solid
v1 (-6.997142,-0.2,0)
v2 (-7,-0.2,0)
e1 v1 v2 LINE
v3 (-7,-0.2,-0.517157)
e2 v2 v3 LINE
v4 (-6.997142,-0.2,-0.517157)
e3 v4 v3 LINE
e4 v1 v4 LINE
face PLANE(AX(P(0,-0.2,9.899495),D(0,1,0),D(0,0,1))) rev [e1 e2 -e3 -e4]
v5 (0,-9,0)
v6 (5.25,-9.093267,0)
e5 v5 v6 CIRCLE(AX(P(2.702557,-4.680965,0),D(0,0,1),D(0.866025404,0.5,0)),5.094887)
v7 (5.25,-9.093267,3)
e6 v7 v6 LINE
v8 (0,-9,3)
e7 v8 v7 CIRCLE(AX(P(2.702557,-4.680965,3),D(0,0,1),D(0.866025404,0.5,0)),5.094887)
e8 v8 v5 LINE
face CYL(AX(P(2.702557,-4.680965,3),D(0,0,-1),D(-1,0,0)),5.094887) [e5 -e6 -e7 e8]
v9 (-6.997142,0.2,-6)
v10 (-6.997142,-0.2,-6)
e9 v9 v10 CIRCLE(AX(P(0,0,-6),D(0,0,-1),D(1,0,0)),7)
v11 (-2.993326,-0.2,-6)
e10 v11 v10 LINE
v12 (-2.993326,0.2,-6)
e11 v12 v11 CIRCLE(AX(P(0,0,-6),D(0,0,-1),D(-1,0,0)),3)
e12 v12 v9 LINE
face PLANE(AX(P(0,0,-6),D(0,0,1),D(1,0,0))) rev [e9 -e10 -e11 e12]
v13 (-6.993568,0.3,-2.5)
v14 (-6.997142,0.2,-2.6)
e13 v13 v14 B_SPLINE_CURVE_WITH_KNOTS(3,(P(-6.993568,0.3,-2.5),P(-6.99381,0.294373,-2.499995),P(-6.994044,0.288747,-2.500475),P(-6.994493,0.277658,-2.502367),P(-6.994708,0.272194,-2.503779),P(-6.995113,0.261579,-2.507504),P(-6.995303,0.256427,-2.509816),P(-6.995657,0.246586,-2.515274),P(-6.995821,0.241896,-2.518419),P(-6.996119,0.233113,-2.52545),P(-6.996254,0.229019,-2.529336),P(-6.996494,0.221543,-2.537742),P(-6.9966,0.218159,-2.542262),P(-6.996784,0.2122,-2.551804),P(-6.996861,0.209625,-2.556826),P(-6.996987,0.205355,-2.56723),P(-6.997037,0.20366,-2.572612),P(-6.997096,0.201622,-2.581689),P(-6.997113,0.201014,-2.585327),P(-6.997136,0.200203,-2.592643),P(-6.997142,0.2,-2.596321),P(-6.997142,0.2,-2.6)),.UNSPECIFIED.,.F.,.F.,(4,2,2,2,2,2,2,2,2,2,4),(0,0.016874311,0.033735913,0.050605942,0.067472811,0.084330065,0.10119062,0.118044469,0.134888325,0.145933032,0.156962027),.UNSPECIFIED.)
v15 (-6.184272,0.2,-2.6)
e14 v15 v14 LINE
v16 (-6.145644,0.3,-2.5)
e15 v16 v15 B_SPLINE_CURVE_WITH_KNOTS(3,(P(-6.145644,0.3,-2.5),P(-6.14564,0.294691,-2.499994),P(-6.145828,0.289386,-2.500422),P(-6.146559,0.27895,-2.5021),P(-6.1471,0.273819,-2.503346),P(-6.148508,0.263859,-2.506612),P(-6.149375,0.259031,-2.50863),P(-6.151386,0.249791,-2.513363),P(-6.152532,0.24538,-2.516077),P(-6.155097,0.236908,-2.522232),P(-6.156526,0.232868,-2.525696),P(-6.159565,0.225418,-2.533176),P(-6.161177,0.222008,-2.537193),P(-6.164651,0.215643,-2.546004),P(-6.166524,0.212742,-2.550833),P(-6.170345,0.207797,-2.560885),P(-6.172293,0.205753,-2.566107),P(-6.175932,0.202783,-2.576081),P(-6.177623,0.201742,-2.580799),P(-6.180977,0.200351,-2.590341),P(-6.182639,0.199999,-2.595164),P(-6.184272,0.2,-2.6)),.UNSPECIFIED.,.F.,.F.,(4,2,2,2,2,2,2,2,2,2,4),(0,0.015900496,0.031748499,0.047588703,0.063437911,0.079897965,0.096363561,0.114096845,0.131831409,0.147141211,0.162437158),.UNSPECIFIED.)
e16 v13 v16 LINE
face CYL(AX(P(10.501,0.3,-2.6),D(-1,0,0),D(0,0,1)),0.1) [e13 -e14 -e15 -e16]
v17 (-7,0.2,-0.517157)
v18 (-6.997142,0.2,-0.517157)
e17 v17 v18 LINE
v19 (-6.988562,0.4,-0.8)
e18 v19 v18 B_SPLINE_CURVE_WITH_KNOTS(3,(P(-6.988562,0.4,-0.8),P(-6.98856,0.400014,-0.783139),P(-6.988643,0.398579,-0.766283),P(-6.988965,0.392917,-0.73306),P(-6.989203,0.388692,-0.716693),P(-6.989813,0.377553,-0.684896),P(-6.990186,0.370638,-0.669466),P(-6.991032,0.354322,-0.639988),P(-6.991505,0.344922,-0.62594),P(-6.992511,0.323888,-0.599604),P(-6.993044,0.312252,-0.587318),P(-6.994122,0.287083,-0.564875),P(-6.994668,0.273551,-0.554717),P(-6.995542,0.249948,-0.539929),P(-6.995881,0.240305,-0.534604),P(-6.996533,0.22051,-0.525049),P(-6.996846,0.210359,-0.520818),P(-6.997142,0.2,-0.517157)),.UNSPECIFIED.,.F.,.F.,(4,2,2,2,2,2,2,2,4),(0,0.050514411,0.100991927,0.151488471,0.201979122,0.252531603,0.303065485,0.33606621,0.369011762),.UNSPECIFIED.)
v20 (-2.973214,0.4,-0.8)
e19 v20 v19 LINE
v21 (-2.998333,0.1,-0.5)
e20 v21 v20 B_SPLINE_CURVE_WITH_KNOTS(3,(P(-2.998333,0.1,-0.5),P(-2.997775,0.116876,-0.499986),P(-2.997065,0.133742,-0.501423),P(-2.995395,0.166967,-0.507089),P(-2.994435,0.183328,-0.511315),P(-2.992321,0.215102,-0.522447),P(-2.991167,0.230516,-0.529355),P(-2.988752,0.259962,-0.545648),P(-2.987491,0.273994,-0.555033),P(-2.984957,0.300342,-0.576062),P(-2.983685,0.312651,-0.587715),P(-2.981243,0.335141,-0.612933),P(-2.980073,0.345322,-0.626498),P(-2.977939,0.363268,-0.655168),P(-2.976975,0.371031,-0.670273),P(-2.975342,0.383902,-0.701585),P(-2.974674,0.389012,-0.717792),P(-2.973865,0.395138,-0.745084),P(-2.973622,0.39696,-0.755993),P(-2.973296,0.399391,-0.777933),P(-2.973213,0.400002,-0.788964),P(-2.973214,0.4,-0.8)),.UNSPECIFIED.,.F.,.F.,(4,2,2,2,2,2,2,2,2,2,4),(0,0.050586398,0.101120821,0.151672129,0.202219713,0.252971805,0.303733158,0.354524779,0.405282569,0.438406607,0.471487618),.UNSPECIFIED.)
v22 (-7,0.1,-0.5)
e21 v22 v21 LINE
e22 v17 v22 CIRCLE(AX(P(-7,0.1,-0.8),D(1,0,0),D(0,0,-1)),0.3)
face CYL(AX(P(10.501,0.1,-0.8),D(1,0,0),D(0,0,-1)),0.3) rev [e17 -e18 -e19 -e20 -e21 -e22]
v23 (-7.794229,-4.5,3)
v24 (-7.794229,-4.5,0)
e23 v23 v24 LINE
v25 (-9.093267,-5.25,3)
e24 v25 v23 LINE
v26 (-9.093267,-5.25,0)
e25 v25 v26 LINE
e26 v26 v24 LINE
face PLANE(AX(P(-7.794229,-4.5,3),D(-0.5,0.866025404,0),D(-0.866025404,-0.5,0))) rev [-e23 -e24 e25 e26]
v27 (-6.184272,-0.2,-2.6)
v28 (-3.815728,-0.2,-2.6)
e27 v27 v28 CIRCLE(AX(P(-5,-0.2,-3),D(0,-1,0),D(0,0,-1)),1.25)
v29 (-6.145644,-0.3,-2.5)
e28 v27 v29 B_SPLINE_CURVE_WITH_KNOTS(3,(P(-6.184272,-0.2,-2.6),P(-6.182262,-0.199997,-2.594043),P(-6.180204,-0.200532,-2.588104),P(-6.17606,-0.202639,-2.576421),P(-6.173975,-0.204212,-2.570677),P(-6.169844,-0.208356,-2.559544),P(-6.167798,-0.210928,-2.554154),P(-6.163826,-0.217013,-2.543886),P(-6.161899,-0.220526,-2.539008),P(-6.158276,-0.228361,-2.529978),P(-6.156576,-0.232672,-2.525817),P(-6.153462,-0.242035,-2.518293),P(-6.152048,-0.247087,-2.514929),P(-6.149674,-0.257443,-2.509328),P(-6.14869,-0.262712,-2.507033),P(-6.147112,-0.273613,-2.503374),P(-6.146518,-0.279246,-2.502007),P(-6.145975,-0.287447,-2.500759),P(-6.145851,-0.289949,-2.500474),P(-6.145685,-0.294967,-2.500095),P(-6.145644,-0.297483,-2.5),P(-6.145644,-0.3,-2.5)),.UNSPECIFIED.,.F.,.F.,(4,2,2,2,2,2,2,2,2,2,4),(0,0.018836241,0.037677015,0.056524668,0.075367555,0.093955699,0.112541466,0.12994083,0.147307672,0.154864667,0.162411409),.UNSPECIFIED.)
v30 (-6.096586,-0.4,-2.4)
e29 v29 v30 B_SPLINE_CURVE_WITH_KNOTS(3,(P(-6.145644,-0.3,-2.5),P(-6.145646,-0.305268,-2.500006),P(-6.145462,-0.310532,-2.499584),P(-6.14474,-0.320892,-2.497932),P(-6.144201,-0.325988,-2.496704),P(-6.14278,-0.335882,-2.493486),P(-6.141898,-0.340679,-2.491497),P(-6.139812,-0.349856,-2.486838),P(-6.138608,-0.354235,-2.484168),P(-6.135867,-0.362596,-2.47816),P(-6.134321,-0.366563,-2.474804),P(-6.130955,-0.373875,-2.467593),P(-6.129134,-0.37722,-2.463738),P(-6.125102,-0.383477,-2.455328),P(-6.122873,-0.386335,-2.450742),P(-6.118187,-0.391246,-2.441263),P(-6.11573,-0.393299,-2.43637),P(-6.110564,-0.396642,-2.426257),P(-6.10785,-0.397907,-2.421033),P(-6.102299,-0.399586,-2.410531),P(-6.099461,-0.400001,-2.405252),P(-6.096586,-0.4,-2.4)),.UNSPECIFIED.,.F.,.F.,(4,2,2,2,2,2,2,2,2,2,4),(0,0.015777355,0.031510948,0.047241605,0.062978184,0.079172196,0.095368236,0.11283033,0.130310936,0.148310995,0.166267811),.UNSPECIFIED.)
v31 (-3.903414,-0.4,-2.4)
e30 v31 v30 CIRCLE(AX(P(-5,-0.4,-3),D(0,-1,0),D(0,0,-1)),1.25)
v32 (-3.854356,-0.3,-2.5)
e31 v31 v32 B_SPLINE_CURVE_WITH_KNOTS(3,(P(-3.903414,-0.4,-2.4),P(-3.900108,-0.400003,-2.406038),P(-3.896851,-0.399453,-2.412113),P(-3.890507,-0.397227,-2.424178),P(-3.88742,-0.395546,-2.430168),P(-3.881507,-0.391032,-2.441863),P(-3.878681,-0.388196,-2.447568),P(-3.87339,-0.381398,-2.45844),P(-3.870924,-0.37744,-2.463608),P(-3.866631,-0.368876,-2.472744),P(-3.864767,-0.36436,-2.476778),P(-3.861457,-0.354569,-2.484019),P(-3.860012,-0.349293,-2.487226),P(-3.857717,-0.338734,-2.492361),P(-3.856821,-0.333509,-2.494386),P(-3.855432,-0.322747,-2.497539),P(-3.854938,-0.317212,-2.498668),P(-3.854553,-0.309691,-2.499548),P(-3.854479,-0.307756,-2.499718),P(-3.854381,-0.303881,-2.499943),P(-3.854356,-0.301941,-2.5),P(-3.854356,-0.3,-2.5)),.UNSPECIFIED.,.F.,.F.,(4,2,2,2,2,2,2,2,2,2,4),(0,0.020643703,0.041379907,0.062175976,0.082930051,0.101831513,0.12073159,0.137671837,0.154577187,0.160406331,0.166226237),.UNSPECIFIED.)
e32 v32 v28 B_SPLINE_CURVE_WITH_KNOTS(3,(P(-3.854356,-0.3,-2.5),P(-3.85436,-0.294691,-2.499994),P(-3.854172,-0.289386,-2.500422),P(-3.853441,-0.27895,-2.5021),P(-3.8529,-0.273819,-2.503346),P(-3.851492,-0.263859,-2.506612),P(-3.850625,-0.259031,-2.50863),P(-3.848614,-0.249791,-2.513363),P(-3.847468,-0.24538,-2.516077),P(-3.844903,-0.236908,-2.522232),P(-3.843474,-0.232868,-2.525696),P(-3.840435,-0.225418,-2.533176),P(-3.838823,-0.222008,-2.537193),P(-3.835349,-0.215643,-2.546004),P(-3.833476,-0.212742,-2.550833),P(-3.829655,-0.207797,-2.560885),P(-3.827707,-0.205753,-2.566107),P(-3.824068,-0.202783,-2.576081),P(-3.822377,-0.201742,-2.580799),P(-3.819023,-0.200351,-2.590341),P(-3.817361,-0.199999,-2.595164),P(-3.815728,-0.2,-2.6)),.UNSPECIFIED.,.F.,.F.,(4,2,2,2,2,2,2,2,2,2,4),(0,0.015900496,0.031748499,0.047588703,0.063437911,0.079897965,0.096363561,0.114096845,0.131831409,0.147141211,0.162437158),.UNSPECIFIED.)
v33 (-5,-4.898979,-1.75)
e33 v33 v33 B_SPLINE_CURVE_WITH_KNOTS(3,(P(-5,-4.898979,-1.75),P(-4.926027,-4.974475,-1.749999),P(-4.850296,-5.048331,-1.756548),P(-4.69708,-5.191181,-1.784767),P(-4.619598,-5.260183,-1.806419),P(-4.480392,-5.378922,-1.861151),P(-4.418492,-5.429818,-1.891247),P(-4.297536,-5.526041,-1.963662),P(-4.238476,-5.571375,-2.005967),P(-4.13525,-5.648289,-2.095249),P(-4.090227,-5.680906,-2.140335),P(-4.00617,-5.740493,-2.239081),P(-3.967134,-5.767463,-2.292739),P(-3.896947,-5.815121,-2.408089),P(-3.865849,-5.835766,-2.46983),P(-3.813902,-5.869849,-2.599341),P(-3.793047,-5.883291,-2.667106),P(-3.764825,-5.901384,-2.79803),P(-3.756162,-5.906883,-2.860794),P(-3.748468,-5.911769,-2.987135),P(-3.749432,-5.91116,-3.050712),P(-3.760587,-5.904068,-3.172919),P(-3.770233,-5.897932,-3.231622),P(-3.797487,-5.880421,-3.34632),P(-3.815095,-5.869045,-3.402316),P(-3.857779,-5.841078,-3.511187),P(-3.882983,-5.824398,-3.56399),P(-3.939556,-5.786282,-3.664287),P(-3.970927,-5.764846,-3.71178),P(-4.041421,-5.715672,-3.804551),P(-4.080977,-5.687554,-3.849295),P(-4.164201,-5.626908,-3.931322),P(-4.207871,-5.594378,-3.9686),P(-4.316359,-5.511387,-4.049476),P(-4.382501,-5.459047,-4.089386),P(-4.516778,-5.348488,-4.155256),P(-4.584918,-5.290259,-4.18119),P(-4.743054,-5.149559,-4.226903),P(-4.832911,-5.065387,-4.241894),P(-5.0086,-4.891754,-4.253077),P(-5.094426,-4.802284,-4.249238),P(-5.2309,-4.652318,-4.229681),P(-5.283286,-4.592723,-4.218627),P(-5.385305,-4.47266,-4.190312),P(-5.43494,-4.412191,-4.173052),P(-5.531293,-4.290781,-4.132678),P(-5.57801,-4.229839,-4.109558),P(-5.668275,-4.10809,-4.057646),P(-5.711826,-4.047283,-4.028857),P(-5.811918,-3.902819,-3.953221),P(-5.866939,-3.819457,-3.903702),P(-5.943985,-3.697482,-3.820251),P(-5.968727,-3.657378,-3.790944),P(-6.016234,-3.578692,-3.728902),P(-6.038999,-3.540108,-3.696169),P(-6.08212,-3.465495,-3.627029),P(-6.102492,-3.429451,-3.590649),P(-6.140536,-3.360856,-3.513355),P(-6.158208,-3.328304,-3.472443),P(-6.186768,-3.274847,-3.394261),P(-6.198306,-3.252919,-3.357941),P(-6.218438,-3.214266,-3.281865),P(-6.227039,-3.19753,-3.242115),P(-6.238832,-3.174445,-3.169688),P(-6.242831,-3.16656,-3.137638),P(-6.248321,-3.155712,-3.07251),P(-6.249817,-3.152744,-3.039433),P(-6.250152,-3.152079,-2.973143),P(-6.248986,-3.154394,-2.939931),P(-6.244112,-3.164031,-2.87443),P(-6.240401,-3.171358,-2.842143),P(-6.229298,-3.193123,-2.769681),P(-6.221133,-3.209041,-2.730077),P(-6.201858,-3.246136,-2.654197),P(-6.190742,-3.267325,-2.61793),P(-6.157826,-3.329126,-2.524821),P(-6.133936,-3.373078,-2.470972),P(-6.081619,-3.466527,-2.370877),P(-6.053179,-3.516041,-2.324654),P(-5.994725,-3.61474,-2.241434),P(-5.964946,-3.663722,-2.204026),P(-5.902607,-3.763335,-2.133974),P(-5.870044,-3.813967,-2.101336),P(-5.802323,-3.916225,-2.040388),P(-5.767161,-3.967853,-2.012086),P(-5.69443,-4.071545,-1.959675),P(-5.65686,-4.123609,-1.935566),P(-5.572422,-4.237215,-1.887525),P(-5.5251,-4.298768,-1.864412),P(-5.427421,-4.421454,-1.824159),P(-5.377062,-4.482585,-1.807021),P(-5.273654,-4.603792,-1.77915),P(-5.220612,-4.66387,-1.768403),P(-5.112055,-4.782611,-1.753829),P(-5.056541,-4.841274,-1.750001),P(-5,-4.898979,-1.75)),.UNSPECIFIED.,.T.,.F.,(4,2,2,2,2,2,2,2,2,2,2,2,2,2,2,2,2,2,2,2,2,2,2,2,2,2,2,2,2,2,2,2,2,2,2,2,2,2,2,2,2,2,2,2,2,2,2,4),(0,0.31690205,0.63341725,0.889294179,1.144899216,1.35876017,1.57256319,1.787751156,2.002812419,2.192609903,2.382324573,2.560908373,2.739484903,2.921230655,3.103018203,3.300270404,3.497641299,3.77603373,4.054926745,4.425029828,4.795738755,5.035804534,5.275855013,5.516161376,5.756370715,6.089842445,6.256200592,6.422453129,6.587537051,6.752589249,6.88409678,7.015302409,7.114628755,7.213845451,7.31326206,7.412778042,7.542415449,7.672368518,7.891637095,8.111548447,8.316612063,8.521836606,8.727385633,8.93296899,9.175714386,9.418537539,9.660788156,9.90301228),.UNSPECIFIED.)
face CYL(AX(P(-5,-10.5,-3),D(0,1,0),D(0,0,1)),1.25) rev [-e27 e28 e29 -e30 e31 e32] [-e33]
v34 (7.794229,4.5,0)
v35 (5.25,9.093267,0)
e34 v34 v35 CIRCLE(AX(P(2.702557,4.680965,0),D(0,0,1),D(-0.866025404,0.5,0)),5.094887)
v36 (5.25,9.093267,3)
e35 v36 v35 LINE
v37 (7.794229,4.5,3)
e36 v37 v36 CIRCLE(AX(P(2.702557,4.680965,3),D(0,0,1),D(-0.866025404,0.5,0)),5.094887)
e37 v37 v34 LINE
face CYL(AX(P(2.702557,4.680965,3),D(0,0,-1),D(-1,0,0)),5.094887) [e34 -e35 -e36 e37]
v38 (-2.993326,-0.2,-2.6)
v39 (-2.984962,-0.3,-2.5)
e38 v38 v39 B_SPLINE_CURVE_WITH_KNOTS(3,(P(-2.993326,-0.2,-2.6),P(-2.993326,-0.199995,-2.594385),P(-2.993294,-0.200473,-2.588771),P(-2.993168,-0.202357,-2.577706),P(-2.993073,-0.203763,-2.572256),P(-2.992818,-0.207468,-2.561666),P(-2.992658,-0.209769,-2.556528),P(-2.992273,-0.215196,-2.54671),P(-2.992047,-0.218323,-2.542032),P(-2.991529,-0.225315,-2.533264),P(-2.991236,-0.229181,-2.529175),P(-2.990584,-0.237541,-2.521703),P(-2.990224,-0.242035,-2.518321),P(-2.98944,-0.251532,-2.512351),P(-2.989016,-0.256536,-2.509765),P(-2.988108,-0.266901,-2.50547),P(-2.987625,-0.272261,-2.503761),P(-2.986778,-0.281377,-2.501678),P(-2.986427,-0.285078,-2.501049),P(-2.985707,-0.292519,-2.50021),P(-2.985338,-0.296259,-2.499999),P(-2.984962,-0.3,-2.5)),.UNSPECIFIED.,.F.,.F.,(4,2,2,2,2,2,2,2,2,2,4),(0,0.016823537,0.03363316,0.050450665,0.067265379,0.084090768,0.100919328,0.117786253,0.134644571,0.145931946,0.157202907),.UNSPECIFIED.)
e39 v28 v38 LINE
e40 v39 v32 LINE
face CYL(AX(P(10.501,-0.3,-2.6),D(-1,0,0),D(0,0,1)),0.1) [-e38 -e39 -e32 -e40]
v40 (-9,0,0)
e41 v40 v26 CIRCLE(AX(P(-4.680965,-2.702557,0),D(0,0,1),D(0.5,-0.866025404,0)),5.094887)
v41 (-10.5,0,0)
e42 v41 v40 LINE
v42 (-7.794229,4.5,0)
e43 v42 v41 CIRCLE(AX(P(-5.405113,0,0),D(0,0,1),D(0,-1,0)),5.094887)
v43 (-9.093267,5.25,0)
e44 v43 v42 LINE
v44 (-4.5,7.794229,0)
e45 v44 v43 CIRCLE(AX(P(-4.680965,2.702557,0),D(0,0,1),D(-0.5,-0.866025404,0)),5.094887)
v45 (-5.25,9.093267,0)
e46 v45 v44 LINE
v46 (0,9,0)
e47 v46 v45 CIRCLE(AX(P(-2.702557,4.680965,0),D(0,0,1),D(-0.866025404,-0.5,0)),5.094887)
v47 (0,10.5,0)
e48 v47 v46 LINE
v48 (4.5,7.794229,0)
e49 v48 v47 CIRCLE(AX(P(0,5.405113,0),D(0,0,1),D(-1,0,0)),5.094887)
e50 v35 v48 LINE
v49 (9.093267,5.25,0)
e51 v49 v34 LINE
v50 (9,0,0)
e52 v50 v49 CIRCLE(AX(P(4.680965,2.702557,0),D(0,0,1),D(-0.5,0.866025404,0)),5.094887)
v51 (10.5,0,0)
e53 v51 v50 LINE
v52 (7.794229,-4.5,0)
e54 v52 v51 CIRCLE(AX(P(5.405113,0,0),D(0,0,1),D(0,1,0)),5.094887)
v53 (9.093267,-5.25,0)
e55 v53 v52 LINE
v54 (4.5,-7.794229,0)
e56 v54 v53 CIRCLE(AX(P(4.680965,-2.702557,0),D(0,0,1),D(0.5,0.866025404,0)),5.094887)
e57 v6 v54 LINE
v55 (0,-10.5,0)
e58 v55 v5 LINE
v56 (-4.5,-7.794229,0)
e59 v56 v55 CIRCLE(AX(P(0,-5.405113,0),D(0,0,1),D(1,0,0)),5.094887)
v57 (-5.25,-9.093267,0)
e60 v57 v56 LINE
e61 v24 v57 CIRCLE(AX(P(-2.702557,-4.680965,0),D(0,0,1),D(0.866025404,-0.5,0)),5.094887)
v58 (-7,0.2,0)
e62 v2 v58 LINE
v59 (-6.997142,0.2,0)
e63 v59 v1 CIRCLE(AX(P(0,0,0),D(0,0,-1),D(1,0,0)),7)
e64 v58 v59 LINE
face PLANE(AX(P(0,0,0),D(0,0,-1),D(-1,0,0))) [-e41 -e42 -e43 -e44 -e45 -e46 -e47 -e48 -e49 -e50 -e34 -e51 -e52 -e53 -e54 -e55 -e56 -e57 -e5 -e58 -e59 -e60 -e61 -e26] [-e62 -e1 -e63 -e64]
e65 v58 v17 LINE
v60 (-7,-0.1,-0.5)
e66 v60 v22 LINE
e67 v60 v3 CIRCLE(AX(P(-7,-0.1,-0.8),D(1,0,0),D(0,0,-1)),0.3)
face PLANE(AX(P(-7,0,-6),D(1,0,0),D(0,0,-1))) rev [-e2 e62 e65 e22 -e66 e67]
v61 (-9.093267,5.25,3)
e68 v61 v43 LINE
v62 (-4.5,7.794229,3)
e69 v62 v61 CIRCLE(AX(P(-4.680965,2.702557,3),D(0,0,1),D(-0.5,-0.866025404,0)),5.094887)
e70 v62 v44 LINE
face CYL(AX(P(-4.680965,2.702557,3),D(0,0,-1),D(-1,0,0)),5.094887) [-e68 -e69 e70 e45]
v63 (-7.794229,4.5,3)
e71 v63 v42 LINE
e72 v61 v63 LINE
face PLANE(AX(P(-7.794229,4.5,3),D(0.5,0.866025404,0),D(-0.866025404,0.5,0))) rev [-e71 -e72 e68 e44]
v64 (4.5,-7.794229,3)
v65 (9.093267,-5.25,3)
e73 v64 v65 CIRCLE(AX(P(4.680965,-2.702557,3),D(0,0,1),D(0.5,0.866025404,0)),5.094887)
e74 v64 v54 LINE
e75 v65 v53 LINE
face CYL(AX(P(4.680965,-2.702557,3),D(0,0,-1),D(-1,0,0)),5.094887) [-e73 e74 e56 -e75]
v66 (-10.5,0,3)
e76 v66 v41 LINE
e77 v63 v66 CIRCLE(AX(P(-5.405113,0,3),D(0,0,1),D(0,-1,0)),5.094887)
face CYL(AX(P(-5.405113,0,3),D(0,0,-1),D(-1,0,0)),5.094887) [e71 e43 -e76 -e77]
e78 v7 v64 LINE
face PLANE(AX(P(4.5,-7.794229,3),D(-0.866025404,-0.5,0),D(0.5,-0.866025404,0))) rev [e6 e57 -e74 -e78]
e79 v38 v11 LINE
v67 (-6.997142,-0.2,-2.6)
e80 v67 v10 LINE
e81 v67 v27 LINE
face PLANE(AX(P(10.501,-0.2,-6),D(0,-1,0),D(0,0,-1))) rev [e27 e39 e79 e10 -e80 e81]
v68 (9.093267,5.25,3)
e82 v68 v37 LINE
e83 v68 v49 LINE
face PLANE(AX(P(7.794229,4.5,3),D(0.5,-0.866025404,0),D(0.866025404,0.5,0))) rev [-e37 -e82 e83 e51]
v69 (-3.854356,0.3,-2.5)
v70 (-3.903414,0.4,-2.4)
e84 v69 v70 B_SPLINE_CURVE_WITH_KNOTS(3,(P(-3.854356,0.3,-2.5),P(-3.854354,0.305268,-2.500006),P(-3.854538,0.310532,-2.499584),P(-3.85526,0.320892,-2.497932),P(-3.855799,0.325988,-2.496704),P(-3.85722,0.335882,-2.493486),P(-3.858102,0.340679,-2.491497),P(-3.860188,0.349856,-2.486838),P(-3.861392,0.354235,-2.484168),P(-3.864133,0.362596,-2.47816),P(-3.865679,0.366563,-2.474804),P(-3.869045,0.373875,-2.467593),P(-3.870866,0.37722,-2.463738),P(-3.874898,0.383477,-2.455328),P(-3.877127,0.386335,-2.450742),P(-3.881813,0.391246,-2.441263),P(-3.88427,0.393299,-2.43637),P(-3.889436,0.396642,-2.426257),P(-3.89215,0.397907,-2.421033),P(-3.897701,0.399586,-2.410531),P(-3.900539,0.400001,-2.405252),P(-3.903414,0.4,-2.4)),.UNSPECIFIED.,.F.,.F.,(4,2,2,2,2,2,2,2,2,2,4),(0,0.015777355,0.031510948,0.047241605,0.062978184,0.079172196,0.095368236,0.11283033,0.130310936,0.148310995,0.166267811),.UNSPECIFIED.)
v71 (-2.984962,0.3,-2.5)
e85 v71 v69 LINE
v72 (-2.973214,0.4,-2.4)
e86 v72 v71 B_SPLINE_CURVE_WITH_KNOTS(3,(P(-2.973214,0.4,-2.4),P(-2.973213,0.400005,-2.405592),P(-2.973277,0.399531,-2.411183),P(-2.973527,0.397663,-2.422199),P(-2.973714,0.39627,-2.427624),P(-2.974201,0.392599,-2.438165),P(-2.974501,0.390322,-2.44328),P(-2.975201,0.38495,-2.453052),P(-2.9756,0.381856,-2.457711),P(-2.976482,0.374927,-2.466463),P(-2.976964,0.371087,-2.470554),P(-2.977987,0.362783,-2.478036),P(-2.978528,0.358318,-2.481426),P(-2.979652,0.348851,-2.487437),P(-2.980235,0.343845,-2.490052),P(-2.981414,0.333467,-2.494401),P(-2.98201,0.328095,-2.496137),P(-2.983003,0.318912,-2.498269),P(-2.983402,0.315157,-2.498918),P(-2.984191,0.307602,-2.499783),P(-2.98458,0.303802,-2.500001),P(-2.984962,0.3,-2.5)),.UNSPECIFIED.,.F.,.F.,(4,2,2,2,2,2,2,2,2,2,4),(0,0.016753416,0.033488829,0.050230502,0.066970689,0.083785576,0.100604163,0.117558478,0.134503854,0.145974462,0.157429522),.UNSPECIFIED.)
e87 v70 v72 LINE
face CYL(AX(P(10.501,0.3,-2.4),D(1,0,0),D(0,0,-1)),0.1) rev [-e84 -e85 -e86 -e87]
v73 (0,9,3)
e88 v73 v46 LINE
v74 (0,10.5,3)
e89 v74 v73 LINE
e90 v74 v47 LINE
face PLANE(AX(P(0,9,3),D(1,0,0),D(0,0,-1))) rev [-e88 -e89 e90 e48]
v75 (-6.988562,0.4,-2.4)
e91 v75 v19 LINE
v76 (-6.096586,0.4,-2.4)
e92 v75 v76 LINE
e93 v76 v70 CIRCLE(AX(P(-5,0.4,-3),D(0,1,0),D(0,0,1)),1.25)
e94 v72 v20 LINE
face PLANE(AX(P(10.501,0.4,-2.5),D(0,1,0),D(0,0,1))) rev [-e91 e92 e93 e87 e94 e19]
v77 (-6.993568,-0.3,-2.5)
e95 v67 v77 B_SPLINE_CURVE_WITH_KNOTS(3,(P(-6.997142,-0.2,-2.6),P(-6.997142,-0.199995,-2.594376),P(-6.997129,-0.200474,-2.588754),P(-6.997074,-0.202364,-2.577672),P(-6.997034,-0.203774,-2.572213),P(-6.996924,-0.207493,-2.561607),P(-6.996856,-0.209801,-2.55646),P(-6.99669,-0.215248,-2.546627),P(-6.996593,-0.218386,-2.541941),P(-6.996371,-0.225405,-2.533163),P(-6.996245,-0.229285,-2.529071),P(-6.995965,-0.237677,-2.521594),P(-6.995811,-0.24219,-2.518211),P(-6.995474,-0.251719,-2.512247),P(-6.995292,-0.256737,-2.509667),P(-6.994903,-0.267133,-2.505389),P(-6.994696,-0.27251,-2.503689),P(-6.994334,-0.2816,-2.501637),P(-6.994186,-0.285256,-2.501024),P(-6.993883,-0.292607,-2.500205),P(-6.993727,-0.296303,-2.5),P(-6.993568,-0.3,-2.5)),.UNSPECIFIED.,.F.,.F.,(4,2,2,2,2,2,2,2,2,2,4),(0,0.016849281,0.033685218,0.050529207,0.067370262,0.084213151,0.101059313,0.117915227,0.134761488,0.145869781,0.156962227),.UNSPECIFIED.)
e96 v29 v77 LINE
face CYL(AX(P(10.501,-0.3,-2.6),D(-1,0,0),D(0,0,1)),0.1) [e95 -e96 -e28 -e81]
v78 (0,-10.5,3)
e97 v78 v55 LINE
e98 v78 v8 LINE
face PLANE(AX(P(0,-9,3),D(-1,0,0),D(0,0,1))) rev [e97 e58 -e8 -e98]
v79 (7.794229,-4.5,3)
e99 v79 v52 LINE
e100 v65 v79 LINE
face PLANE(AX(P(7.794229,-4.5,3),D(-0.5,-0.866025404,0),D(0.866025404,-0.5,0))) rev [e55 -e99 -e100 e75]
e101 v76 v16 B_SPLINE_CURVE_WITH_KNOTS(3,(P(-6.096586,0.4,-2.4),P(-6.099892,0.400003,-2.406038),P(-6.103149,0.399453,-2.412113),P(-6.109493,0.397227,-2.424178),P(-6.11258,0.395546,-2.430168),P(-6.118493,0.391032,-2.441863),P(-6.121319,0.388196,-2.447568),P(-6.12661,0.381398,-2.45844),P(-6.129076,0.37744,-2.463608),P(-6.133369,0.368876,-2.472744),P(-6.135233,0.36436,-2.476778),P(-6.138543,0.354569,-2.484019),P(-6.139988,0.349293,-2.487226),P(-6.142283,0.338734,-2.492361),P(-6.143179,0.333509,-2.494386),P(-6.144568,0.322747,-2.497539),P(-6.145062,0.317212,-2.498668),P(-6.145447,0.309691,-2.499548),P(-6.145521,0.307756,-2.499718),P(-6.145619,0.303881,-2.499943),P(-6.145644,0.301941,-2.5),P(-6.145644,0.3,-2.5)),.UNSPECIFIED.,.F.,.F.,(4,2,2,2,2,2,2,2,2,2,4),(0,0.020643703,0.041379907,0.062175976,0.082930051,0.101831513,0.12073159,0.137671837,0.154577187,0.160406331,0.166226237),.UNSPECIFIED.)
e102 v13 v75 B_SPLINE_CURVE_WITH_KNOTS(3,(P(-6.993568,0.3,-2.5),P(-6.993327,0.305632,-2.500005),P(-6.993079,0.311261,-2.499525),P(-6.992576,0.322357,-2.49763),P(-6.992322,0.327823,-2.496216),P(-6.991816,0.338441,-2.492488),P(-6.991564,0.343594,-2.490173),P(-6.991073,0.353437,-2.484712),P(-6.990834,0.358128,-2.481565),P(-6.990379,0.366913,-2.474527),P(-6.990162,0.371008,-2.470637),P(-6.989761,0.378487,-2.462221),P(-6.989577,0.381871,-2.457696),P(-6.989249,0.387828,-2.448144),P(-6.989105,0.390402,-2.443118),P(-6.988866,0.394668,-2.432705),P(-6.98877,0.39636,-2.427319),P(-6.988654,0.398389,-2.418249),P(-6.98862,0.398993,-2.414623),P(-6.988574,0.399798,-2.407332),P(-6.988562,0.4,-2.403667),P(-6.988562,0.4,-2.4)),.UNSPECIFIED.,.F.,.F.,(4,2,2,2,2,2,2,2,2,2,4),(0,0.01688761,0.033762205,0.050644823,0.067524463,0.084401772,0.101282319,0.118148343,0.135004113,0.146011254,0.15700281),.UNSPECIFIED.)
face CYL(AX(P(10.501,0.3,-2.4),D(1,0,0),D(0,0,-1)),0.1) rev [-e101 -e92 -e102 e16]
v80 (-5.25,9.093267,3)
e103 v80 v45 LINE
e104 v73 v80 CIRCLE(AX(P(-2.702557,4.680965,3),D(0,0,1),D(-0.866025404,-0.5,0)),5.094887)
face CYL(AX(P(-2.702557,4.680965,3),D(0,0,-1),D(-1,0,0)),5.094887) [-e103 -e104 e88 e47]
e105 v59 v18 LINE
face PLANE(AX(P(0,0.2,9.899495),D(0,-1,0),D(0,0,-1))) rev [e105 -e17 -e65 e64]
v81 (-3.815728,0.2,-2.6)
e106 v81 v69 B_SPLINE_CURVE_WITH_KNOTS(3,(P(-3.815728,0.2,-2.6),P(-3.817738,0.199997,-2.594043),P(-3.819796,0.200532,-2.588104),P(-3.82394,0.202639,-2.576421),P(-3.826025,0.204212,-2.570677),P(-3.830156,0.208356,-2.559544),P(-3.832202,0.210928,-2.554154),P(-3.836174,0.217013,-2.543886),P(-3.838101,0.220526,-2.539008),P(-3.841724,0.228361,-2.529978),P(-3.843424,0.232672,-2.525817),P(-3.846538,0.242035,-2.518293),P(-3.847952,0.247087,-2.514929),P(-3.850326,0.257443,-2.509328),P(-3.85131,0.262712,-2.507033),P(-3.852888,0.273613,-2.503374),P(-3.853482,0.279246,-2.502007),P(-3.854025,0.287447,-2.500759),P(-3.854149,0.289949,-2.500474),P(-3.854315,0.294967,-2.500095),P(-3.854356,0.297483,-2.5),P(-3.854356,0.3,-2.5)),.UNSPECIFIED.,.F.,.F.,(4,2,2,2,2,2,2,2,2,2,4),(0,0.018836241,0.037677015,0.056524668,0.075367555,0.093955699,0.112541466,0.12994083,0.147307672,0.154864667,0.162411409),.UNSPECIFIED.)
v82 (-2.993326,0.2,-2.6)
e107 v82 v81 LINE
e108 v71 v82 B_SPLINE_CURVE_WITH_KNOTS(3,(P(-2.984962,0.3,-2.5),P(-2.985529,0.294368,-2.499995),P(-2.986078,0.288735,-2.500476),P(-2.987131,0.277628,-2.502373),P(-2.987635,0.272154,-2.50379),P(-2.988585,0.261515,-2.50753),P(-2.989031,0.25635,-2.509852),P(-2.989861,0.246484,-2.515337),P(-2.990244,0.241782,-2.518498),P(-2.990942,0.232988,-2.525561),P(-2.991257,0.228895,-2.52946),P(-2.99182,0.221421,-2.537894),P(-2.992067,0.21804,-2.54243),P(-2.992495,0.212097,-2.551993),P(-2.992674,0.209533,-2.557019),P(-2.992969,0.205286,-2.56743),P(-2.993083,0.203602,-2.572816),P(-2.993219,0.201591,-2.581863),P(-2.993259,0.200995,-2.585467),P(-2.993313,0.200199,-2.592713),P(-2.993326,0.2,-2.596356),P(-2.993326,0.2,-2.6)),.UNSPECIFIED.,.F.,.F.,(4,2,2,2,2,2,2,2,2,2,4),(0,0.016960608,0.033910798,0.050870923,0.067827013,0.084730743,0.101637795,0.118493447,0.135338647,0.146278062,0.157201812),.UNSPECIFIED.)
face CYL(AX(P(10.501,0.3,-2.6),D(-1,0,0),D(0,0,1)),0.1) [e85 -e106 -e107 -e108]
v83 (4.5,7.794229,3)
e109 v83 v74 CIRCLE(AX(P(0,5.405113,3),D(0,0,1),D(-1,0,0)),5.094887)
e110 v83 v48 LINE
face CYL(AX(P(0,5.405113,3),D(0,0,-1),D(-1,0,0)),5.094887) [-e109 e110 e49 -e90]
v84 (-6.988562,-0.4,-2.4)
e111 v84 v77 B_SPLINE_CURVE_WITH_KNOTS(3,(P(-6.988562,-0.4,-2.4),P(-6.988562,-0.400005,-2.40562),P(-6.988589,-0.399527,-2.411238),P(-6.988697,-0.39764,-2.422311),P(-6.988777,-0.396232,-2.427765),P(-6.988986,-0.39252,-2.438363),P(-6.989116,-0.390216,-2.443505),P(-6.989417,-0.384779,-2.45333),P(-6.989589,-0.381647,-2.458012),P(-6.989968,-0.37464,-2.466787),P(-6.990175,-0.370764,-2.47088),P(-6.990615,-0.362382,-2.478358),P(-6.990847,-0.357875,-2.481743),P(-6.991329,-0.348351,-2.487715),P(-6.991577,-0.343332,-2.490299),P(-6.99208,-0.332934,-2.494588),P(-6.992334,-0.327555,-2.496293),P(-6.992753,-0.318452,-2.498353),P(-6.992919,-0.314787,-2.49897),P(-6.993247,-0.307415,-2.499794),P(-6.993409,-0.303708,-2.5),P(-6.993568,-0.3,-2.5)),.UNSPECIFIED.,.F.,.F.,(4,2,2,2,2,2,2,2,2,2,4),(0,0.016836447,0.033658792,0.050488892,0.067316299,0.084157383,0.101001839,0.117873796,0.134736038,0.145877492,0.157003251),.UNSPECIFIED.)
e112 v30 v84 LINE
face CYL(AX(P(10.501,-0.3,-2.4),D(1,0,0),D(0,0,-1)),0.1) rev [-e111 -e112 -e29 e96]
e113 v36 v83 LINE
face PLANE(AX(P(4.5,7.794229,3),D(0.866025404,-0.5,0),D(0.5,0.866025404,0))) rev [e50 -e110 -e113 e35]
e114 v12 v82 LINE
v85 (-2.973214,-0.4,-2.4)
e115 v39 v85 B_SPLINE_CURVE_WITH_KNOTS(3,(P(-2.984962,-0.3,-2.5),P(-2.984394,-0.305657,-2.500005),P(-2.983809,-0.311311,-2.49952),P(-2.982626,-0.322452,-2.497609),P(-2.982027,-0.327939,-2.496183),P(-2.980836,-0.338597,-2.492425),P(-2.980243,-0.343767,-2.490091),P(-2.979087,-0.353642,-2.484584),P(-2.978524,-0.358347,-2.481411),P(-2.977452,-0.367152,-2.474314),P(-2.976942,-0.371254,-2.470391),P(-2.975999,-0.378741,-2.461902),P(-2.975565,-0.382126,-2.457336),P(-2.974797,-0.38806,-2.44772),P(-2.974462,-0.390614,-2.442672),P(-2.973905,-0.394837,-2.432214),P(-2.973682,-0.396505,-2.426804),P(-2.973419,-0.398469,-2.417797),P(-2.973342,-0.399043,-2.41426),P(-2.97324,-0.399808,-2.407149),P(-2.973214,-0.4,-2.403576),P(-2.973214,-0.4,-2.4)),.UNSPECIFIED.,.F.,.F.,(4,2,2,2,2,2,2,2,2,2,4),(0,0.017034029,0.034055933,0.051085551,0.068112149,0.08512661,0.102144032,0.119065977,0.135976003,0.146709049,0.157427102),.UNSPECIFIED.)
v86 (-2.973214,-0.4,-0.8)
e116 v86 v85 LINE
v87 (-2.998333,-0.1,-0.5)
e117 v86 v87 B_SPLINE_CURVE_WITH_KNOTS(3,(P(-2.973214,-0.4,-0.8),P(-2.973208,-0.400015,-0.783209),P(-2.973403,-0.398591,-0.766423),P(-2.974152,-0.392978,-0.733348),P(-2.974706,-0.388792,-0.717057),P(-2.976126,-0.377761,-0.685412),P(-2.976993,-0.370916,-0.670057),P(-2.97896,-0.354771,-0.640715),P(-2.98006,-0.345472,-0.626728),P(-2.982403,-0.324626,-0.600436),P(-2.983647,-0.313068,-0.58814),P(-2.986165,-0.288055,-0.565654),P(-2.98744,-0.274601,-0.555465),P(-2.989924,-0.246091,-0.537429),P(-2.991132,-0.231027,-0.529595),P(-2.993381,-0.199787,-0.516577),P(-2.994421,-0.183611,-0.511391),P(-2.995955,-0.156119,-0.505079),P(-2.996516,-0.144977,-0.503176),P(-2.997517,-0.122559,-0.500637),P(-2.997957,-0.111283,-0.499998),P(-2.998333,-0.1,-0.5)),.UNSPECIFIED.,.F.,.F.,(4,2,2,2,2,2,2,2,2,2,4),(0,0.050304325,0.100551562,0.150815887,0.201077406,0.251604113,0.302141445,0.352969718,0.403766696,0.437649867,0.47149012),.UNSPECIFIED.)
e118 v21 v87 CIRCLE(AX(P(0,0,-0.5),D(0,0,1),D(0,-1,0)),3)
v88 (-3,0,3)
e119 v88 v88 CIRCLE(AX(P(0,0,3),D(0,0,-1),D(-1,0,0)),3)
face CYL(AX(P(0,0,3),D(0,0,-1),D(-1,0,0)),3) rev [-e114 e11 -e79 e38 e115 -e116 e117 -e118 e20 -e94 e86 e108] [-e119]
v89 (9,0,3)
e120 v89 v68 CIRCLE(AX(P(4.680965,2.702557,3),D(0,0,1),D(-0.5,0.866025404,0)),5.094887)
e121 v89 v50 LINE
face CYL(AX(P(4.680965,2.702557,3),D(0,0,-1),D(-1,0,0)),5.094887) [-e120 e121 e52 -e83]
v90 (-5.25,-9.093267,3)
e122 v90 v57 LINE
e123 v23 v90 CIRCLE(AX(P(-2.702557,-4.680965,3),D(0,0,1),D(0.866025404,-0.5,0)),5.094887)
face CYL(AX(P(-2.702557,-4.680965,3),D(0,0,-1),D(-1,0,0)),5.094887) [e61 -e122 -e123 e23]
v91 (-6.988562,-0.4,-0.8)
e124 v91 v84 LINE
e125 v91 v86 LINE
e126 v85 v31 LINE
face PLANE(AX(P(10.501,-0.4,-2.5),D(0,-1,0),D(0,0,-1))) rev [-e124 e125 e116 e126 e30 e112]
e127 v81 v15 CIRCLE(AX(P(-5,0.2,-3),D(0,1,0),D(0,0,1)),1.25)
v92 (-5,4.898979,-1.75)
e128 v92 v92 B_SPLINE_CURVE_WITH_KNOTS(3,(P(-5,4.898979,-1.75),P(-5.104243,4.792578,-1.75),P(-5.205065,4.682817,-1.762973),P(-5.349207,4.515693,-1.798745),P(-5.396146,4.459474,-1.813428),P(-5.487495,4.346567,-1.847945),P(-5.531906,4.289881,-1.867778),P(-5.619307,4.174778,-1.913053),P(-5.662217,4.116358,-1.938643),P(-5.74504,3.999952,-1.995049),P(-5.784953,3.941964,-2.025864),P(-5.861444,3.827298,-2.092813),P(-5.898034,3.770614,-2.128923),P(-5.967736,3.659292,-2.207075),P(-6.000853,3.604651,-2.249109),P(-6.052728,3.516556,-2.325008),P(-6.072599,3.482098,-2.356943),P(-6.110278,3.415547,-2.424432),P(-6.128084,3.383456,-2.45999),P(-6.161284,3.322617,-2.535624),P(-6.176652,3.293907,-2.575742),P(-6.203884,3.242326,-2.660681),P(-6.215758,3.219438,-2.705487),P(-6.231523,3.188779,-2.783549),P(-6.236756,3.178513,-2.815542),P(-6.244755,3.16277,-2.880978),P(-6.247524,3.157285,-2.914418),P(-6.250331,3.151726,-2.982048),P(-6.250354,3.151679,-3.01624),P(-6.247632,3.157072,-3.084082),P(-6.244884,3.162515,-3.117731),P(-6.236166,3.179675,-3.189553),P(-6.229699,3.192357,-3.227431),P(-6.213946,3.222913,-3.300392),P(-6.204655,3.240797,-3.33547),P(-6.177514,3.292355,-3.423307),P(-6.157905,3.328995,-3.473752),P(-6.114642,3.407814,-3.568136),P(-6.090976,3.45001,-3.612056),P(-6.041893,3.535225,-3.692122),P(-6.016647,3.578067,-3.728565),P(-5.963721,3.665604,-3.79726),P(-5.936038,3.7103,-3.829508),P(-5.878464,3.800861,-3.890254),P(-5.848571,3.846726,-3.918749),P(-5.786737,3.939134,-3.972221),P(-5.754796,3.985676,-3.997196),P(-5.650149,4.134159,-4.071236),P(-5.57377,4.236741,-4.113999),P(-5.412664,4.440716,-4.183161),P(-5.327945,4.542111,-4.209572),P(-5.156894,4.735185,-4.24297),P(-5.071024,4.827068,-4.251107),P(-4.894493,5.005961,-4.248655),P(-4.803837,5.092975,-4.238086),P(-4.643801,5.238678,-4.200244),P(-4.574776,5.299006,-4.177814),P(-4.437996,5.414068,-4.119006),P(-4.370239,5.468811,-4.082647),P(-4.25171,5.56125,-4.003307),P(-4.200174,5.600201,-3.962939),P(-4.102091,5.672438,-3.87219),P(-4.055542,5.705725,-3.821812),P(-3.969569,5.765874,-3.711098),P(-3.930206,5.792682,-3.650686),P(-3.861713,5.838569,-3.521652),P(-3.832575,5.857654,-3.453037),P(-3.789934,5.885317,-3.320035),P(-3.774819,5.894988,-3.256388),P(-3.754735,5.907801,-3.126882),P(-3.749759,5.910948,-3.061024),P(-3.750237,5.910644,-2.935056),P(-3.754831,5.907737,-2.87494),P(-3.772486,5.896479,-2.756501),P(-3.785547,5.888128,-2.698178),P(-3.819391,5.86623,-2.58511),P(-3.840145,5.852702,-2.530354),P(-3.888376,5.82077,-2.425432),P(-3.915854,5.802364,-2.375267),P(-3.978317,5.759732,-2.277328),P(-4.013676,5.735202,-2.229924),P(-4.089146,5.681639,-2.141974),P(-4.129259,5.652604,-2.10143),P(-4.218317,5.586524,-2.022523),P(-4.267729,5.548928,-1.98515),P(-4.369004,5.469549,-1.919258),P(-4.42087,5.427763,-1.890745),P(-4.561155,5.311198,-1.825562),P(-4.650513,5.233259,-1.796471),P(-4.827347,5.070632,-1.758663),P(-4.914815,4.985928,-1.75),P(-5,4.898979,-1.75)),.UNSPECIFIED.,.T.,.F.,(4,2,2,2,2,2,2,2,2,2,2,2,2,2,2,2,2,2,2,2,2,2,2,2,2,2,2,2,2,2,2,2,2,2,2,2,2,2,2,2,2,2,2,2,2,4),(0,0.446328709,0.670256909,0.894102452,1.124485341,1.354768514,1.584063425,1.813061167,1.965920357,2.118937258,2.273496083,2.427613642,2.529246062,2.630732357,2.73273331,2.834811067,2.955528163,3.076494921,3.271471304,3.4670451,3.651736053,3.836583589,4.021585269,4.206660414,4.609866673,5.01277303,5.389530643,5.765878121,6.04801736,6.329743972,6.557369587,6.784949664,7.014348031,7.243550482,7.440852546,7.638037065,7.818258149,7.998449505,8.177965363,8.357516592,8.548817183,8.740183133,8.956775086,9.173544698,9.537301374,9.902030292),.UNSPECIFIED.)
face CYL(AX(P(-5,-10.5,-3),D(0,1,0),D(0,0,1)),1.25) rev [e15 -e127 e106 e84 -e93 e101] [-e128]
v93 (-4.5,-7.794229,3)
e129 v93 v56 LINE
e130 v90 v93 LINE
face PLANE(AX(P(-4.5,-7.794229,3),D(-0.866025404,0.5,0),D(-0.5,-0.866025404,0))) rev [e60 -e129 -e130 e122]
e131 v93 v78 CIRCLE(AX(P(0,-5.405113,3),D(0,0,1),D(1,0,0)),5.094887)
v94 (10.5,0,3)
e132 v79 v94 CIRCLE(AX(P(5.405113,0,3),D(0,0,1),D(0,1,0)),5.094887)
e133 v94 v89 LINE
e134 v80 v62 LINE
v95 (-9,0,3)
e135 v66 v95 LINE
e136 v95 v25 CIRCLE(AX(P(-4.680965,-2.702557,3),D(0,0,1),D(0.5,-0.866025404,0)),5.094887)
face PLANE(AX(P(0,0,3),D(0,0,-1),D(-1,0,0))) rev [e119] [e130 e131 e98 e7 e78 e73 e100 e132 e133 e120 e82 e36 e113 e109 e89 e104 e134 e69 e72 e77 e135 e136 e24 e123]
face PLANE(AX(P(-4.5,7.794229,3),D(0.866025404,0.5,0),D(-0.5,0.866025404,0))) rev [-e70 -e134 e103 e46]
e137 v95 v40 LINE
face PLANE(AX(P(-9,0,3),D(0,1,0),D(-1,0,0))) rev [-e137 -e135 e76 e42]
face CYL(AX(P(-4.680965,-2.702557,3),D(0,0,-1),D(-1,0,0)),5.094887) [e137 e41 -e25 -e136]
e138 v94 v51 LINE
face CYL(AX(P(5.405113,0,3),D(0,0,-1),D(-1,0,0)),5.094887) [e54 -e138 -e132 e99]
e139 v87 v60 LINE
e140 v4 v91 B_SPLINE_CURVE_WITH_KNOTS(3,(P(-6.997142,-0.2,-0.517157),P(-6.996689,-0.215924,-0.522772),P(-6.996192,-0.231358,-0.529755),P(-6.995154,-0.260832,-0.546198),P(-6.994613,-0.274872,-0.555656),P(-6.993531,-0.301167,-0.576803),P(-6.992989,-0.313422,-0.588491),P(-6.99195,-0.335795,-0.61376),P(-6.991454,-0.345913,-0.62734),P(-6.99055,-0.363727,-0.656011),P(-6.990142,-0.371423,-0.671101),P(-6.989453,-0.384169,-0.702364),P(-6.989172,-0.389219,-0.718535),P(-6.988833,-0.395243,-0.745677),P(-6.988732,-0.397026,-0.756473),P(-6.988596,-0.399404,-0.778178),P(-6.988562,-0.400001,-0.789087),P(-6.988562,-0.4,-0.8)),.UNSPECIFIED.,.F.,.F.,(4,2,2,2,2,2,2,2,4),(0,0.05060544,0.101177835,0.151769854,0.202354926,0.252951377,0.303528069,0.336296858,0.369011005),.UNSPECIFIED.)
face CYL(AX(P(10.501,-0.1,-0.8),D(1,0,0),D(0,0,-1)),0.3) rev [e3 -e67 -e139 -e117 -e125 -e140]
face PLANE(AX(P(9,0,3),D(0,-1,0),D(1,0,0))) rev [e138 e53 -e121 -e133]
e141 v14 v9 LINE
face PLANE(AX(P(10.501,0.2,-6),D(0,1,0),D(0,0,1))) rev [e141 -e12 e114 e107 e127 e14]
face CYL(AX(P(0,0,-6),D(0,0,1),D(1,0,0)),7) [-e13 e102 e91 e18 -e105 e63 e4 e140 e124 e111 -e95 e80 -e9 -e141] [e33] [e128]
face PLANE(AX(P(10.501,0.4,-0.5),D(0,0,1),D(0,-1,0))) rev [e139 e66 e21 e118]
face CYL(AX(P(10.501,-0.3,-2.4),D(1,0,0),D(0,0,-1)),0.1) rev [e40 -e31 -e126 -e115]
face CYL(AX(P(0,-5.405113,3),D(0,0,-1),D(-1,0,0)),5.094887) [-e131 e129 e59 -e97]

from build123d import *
from build123d.topology import SkipClean

# Parameters (mm, degrees)
BOSS_EXTRUDE1_DEPTH = 3
CIRPATTERN1_COUNT   = 12
BOSS_EXTRUDE2_START = 6
SKETCH3_R           = 3
BOSS_EXTRUDE2_DEPTH = 6
SKETCH4_R           = 1.25
CUT_EXTRUDE1_DEPTH  = 22.272047386
CUT_EXTRUDE3_REACH  = 23.272
FILLET2_R           = 0.1
FILLET3_R           = 0.3
CUT_EXTRUDE4_DEPTH  = 6


with BuildPart() as part:
    # Sketch1 → Boss-Extrude1 (new body)
    with BuildSketch(Plane.XY):
        with BuildLine():
            Line((0, 9), (0, 10.5))
            ThreePointArc((0, 10.5), (2.62541419, 9.771470047), (4.5, 7.794228634))
            Line((4.5, 7.794228634), (1.5, 2.598076211))
            ThreePointArc((1.5, 2.598076211), (0.776457135, 2.897777479), (0, 3))
            Line((0, 3), (0, 9))
        make_face()
    boss_extrude1 = extrude(amount=BOSS_EXTRUDE1_DEPTH)

    # CirPattern1: Boss-Extrude1 ×12 about axis
    cirpattern1_axis = Axis((0, 0, 0), (0, 0, 1))
    for i in range(1, CIRPATTERN1_COUNT):
        add(boss_extrude1.rotate(cirpattern1_axis, i * 360 / CIRPATTERN1_COUNT))

    # Sketch3 → Boss-Extrude2 (add)
    with SkipClean():  # the faces are left unmerged after this step: merging them gives an invalid solid
        with BuildSketch(Plane(origin=(0, 0, 0), x_dir=(-1, 0, 0), z_dir=(0, 0, -1)).offset(BOSS_EXTRUDE2_START)):
            with BuildLine():
                Line((7, 0), (7, -7))
                Line((7, -7), (0, -7))
                ThreePointArc((0, -7), (-4.949747468, -4.949747468), (-7, 0))
                Line((-7, 0), (-7, 7))
                Line((-7, 7), (7, 7))
                Line((7, 7), (7, 0))
            make_face()
            Circle(SKETCH3_R, mode=Mode.SUBTRACT)
        extrude(amount=-BOSS_EXTRUDE2_DEPTH)

    # Sketch4 → Cut-Extrude1 (cut, through all)
    with SkipClean():  # the faces are left unmerged after this step: merging them gives an invalid solid
        with BuildSketch(Plane(origin=(0, 7, 0), x_dir=(1, 0, 0), z_dir=(0, 1, 0))):
            with Locations(Location((-5, 3, 0), (0, 0, 270))):
                Circle(SKETCH4_R)
        extrude(amount=-CUT_EXTRUDE1_DEPTH, mode=Mode.SUBTRACT)

    # Sketch6 → Cut-Extrude3 (cut, up to next)
    with BuildSketch(Plane.ZY.offset(7), mode=Mode.PRIVATE) as cut_extrude3_sk1:
        Polygon((-6, -0.2), (-6, 0.2), (-2.5, 0.2), (-2.5, 0.4), (-0.5, 0.4), (-0.5, -0.4), (-2.5, -0.4), (-2.5, -0.2), align=None)
    cut_extrude3_tool1 = extrude(cut_extrude3_sk1.sketch, amount=-CUT_EXTRUDE3_REACH, mode=Mode.PRIVATE) & part.part
    add(cut_extrude3_tool1.solids().sort_by_distance((-7, 0, -2.783333))[0], mode=Mode.SUBTRACT)

    # Fillet2
    fillet2_edges = [part.edges().sort_by_distance(p)[0] for p in [
        (-6.572821962, 0.4, -2.5),
        (-3.423840993, 0.2, -2.5),
        (-3.413784913, 0.4, -2.5),
        (-6.572821962, 0.2, -2.5),
        (-3.413784913, -0.4, -2.5),
        (-3.423840993, -0.2, -2.5),
        (-6.572821962, -0.4, -2.5),
        (-6.572821962, -0.2, -2.5),
    ]]
    fillet(fillet2_edges, radius=FILLET2_R - 0.0001)  # a hair under: the kernel refuses the full size

    # Fillet3
    fillet3_edges = [part.edges().sort_by_distance(p)[0] for p in [
        (-4.986606875, 0.4, -0.5),
        (-4.986606875, -0.4, -0.5),
    ]]
    fillet(fillet3_edges, radius=FILLET3_R)

    # Sketch7 → Cut-Extrude4 (cut)
    with SkipClean():  # the faces are left unmerged after this step: merging them gives an invalid solid
        with BuildSketch(Plane(origin=(0, 0, -6), x_dir=(-1, 0, 0), z_dir=(0, 0, -1))):
            with BuildLine():
                Line((0, 7), (-7, 7))
                Line((-7, 7), (-7, 0))
                ThreePointArc((-7, 0), (-4.949747468, 4.949747468), (0, 7))
            make_face()
            with BuildLine():
                Line((7, 7), (0, 7))
                ThreePointArc((0, 7), (4.878524367, 5.019960159), (6.997142274, 0.2))
                Line((6.997142274, 0.2), (7, 0.2))
                Line((7, 0.2), (7, 7))
            make_face()
            with BuildLine():
                Line((7, -7), (7, -0.2))
                Line((7, -0.2), (6.997142274, -0.2))
                ThreePointArc((6.997142274, -0.2), (4.878524367, -5.019960159), (0, -7))
                Line((0, -7), (7, -7))
            make_face()
        extrude(amount=-CUT_EXTRUDE4_DEPTH, mode=Mode.SUBTRACT)


solid = part.part
